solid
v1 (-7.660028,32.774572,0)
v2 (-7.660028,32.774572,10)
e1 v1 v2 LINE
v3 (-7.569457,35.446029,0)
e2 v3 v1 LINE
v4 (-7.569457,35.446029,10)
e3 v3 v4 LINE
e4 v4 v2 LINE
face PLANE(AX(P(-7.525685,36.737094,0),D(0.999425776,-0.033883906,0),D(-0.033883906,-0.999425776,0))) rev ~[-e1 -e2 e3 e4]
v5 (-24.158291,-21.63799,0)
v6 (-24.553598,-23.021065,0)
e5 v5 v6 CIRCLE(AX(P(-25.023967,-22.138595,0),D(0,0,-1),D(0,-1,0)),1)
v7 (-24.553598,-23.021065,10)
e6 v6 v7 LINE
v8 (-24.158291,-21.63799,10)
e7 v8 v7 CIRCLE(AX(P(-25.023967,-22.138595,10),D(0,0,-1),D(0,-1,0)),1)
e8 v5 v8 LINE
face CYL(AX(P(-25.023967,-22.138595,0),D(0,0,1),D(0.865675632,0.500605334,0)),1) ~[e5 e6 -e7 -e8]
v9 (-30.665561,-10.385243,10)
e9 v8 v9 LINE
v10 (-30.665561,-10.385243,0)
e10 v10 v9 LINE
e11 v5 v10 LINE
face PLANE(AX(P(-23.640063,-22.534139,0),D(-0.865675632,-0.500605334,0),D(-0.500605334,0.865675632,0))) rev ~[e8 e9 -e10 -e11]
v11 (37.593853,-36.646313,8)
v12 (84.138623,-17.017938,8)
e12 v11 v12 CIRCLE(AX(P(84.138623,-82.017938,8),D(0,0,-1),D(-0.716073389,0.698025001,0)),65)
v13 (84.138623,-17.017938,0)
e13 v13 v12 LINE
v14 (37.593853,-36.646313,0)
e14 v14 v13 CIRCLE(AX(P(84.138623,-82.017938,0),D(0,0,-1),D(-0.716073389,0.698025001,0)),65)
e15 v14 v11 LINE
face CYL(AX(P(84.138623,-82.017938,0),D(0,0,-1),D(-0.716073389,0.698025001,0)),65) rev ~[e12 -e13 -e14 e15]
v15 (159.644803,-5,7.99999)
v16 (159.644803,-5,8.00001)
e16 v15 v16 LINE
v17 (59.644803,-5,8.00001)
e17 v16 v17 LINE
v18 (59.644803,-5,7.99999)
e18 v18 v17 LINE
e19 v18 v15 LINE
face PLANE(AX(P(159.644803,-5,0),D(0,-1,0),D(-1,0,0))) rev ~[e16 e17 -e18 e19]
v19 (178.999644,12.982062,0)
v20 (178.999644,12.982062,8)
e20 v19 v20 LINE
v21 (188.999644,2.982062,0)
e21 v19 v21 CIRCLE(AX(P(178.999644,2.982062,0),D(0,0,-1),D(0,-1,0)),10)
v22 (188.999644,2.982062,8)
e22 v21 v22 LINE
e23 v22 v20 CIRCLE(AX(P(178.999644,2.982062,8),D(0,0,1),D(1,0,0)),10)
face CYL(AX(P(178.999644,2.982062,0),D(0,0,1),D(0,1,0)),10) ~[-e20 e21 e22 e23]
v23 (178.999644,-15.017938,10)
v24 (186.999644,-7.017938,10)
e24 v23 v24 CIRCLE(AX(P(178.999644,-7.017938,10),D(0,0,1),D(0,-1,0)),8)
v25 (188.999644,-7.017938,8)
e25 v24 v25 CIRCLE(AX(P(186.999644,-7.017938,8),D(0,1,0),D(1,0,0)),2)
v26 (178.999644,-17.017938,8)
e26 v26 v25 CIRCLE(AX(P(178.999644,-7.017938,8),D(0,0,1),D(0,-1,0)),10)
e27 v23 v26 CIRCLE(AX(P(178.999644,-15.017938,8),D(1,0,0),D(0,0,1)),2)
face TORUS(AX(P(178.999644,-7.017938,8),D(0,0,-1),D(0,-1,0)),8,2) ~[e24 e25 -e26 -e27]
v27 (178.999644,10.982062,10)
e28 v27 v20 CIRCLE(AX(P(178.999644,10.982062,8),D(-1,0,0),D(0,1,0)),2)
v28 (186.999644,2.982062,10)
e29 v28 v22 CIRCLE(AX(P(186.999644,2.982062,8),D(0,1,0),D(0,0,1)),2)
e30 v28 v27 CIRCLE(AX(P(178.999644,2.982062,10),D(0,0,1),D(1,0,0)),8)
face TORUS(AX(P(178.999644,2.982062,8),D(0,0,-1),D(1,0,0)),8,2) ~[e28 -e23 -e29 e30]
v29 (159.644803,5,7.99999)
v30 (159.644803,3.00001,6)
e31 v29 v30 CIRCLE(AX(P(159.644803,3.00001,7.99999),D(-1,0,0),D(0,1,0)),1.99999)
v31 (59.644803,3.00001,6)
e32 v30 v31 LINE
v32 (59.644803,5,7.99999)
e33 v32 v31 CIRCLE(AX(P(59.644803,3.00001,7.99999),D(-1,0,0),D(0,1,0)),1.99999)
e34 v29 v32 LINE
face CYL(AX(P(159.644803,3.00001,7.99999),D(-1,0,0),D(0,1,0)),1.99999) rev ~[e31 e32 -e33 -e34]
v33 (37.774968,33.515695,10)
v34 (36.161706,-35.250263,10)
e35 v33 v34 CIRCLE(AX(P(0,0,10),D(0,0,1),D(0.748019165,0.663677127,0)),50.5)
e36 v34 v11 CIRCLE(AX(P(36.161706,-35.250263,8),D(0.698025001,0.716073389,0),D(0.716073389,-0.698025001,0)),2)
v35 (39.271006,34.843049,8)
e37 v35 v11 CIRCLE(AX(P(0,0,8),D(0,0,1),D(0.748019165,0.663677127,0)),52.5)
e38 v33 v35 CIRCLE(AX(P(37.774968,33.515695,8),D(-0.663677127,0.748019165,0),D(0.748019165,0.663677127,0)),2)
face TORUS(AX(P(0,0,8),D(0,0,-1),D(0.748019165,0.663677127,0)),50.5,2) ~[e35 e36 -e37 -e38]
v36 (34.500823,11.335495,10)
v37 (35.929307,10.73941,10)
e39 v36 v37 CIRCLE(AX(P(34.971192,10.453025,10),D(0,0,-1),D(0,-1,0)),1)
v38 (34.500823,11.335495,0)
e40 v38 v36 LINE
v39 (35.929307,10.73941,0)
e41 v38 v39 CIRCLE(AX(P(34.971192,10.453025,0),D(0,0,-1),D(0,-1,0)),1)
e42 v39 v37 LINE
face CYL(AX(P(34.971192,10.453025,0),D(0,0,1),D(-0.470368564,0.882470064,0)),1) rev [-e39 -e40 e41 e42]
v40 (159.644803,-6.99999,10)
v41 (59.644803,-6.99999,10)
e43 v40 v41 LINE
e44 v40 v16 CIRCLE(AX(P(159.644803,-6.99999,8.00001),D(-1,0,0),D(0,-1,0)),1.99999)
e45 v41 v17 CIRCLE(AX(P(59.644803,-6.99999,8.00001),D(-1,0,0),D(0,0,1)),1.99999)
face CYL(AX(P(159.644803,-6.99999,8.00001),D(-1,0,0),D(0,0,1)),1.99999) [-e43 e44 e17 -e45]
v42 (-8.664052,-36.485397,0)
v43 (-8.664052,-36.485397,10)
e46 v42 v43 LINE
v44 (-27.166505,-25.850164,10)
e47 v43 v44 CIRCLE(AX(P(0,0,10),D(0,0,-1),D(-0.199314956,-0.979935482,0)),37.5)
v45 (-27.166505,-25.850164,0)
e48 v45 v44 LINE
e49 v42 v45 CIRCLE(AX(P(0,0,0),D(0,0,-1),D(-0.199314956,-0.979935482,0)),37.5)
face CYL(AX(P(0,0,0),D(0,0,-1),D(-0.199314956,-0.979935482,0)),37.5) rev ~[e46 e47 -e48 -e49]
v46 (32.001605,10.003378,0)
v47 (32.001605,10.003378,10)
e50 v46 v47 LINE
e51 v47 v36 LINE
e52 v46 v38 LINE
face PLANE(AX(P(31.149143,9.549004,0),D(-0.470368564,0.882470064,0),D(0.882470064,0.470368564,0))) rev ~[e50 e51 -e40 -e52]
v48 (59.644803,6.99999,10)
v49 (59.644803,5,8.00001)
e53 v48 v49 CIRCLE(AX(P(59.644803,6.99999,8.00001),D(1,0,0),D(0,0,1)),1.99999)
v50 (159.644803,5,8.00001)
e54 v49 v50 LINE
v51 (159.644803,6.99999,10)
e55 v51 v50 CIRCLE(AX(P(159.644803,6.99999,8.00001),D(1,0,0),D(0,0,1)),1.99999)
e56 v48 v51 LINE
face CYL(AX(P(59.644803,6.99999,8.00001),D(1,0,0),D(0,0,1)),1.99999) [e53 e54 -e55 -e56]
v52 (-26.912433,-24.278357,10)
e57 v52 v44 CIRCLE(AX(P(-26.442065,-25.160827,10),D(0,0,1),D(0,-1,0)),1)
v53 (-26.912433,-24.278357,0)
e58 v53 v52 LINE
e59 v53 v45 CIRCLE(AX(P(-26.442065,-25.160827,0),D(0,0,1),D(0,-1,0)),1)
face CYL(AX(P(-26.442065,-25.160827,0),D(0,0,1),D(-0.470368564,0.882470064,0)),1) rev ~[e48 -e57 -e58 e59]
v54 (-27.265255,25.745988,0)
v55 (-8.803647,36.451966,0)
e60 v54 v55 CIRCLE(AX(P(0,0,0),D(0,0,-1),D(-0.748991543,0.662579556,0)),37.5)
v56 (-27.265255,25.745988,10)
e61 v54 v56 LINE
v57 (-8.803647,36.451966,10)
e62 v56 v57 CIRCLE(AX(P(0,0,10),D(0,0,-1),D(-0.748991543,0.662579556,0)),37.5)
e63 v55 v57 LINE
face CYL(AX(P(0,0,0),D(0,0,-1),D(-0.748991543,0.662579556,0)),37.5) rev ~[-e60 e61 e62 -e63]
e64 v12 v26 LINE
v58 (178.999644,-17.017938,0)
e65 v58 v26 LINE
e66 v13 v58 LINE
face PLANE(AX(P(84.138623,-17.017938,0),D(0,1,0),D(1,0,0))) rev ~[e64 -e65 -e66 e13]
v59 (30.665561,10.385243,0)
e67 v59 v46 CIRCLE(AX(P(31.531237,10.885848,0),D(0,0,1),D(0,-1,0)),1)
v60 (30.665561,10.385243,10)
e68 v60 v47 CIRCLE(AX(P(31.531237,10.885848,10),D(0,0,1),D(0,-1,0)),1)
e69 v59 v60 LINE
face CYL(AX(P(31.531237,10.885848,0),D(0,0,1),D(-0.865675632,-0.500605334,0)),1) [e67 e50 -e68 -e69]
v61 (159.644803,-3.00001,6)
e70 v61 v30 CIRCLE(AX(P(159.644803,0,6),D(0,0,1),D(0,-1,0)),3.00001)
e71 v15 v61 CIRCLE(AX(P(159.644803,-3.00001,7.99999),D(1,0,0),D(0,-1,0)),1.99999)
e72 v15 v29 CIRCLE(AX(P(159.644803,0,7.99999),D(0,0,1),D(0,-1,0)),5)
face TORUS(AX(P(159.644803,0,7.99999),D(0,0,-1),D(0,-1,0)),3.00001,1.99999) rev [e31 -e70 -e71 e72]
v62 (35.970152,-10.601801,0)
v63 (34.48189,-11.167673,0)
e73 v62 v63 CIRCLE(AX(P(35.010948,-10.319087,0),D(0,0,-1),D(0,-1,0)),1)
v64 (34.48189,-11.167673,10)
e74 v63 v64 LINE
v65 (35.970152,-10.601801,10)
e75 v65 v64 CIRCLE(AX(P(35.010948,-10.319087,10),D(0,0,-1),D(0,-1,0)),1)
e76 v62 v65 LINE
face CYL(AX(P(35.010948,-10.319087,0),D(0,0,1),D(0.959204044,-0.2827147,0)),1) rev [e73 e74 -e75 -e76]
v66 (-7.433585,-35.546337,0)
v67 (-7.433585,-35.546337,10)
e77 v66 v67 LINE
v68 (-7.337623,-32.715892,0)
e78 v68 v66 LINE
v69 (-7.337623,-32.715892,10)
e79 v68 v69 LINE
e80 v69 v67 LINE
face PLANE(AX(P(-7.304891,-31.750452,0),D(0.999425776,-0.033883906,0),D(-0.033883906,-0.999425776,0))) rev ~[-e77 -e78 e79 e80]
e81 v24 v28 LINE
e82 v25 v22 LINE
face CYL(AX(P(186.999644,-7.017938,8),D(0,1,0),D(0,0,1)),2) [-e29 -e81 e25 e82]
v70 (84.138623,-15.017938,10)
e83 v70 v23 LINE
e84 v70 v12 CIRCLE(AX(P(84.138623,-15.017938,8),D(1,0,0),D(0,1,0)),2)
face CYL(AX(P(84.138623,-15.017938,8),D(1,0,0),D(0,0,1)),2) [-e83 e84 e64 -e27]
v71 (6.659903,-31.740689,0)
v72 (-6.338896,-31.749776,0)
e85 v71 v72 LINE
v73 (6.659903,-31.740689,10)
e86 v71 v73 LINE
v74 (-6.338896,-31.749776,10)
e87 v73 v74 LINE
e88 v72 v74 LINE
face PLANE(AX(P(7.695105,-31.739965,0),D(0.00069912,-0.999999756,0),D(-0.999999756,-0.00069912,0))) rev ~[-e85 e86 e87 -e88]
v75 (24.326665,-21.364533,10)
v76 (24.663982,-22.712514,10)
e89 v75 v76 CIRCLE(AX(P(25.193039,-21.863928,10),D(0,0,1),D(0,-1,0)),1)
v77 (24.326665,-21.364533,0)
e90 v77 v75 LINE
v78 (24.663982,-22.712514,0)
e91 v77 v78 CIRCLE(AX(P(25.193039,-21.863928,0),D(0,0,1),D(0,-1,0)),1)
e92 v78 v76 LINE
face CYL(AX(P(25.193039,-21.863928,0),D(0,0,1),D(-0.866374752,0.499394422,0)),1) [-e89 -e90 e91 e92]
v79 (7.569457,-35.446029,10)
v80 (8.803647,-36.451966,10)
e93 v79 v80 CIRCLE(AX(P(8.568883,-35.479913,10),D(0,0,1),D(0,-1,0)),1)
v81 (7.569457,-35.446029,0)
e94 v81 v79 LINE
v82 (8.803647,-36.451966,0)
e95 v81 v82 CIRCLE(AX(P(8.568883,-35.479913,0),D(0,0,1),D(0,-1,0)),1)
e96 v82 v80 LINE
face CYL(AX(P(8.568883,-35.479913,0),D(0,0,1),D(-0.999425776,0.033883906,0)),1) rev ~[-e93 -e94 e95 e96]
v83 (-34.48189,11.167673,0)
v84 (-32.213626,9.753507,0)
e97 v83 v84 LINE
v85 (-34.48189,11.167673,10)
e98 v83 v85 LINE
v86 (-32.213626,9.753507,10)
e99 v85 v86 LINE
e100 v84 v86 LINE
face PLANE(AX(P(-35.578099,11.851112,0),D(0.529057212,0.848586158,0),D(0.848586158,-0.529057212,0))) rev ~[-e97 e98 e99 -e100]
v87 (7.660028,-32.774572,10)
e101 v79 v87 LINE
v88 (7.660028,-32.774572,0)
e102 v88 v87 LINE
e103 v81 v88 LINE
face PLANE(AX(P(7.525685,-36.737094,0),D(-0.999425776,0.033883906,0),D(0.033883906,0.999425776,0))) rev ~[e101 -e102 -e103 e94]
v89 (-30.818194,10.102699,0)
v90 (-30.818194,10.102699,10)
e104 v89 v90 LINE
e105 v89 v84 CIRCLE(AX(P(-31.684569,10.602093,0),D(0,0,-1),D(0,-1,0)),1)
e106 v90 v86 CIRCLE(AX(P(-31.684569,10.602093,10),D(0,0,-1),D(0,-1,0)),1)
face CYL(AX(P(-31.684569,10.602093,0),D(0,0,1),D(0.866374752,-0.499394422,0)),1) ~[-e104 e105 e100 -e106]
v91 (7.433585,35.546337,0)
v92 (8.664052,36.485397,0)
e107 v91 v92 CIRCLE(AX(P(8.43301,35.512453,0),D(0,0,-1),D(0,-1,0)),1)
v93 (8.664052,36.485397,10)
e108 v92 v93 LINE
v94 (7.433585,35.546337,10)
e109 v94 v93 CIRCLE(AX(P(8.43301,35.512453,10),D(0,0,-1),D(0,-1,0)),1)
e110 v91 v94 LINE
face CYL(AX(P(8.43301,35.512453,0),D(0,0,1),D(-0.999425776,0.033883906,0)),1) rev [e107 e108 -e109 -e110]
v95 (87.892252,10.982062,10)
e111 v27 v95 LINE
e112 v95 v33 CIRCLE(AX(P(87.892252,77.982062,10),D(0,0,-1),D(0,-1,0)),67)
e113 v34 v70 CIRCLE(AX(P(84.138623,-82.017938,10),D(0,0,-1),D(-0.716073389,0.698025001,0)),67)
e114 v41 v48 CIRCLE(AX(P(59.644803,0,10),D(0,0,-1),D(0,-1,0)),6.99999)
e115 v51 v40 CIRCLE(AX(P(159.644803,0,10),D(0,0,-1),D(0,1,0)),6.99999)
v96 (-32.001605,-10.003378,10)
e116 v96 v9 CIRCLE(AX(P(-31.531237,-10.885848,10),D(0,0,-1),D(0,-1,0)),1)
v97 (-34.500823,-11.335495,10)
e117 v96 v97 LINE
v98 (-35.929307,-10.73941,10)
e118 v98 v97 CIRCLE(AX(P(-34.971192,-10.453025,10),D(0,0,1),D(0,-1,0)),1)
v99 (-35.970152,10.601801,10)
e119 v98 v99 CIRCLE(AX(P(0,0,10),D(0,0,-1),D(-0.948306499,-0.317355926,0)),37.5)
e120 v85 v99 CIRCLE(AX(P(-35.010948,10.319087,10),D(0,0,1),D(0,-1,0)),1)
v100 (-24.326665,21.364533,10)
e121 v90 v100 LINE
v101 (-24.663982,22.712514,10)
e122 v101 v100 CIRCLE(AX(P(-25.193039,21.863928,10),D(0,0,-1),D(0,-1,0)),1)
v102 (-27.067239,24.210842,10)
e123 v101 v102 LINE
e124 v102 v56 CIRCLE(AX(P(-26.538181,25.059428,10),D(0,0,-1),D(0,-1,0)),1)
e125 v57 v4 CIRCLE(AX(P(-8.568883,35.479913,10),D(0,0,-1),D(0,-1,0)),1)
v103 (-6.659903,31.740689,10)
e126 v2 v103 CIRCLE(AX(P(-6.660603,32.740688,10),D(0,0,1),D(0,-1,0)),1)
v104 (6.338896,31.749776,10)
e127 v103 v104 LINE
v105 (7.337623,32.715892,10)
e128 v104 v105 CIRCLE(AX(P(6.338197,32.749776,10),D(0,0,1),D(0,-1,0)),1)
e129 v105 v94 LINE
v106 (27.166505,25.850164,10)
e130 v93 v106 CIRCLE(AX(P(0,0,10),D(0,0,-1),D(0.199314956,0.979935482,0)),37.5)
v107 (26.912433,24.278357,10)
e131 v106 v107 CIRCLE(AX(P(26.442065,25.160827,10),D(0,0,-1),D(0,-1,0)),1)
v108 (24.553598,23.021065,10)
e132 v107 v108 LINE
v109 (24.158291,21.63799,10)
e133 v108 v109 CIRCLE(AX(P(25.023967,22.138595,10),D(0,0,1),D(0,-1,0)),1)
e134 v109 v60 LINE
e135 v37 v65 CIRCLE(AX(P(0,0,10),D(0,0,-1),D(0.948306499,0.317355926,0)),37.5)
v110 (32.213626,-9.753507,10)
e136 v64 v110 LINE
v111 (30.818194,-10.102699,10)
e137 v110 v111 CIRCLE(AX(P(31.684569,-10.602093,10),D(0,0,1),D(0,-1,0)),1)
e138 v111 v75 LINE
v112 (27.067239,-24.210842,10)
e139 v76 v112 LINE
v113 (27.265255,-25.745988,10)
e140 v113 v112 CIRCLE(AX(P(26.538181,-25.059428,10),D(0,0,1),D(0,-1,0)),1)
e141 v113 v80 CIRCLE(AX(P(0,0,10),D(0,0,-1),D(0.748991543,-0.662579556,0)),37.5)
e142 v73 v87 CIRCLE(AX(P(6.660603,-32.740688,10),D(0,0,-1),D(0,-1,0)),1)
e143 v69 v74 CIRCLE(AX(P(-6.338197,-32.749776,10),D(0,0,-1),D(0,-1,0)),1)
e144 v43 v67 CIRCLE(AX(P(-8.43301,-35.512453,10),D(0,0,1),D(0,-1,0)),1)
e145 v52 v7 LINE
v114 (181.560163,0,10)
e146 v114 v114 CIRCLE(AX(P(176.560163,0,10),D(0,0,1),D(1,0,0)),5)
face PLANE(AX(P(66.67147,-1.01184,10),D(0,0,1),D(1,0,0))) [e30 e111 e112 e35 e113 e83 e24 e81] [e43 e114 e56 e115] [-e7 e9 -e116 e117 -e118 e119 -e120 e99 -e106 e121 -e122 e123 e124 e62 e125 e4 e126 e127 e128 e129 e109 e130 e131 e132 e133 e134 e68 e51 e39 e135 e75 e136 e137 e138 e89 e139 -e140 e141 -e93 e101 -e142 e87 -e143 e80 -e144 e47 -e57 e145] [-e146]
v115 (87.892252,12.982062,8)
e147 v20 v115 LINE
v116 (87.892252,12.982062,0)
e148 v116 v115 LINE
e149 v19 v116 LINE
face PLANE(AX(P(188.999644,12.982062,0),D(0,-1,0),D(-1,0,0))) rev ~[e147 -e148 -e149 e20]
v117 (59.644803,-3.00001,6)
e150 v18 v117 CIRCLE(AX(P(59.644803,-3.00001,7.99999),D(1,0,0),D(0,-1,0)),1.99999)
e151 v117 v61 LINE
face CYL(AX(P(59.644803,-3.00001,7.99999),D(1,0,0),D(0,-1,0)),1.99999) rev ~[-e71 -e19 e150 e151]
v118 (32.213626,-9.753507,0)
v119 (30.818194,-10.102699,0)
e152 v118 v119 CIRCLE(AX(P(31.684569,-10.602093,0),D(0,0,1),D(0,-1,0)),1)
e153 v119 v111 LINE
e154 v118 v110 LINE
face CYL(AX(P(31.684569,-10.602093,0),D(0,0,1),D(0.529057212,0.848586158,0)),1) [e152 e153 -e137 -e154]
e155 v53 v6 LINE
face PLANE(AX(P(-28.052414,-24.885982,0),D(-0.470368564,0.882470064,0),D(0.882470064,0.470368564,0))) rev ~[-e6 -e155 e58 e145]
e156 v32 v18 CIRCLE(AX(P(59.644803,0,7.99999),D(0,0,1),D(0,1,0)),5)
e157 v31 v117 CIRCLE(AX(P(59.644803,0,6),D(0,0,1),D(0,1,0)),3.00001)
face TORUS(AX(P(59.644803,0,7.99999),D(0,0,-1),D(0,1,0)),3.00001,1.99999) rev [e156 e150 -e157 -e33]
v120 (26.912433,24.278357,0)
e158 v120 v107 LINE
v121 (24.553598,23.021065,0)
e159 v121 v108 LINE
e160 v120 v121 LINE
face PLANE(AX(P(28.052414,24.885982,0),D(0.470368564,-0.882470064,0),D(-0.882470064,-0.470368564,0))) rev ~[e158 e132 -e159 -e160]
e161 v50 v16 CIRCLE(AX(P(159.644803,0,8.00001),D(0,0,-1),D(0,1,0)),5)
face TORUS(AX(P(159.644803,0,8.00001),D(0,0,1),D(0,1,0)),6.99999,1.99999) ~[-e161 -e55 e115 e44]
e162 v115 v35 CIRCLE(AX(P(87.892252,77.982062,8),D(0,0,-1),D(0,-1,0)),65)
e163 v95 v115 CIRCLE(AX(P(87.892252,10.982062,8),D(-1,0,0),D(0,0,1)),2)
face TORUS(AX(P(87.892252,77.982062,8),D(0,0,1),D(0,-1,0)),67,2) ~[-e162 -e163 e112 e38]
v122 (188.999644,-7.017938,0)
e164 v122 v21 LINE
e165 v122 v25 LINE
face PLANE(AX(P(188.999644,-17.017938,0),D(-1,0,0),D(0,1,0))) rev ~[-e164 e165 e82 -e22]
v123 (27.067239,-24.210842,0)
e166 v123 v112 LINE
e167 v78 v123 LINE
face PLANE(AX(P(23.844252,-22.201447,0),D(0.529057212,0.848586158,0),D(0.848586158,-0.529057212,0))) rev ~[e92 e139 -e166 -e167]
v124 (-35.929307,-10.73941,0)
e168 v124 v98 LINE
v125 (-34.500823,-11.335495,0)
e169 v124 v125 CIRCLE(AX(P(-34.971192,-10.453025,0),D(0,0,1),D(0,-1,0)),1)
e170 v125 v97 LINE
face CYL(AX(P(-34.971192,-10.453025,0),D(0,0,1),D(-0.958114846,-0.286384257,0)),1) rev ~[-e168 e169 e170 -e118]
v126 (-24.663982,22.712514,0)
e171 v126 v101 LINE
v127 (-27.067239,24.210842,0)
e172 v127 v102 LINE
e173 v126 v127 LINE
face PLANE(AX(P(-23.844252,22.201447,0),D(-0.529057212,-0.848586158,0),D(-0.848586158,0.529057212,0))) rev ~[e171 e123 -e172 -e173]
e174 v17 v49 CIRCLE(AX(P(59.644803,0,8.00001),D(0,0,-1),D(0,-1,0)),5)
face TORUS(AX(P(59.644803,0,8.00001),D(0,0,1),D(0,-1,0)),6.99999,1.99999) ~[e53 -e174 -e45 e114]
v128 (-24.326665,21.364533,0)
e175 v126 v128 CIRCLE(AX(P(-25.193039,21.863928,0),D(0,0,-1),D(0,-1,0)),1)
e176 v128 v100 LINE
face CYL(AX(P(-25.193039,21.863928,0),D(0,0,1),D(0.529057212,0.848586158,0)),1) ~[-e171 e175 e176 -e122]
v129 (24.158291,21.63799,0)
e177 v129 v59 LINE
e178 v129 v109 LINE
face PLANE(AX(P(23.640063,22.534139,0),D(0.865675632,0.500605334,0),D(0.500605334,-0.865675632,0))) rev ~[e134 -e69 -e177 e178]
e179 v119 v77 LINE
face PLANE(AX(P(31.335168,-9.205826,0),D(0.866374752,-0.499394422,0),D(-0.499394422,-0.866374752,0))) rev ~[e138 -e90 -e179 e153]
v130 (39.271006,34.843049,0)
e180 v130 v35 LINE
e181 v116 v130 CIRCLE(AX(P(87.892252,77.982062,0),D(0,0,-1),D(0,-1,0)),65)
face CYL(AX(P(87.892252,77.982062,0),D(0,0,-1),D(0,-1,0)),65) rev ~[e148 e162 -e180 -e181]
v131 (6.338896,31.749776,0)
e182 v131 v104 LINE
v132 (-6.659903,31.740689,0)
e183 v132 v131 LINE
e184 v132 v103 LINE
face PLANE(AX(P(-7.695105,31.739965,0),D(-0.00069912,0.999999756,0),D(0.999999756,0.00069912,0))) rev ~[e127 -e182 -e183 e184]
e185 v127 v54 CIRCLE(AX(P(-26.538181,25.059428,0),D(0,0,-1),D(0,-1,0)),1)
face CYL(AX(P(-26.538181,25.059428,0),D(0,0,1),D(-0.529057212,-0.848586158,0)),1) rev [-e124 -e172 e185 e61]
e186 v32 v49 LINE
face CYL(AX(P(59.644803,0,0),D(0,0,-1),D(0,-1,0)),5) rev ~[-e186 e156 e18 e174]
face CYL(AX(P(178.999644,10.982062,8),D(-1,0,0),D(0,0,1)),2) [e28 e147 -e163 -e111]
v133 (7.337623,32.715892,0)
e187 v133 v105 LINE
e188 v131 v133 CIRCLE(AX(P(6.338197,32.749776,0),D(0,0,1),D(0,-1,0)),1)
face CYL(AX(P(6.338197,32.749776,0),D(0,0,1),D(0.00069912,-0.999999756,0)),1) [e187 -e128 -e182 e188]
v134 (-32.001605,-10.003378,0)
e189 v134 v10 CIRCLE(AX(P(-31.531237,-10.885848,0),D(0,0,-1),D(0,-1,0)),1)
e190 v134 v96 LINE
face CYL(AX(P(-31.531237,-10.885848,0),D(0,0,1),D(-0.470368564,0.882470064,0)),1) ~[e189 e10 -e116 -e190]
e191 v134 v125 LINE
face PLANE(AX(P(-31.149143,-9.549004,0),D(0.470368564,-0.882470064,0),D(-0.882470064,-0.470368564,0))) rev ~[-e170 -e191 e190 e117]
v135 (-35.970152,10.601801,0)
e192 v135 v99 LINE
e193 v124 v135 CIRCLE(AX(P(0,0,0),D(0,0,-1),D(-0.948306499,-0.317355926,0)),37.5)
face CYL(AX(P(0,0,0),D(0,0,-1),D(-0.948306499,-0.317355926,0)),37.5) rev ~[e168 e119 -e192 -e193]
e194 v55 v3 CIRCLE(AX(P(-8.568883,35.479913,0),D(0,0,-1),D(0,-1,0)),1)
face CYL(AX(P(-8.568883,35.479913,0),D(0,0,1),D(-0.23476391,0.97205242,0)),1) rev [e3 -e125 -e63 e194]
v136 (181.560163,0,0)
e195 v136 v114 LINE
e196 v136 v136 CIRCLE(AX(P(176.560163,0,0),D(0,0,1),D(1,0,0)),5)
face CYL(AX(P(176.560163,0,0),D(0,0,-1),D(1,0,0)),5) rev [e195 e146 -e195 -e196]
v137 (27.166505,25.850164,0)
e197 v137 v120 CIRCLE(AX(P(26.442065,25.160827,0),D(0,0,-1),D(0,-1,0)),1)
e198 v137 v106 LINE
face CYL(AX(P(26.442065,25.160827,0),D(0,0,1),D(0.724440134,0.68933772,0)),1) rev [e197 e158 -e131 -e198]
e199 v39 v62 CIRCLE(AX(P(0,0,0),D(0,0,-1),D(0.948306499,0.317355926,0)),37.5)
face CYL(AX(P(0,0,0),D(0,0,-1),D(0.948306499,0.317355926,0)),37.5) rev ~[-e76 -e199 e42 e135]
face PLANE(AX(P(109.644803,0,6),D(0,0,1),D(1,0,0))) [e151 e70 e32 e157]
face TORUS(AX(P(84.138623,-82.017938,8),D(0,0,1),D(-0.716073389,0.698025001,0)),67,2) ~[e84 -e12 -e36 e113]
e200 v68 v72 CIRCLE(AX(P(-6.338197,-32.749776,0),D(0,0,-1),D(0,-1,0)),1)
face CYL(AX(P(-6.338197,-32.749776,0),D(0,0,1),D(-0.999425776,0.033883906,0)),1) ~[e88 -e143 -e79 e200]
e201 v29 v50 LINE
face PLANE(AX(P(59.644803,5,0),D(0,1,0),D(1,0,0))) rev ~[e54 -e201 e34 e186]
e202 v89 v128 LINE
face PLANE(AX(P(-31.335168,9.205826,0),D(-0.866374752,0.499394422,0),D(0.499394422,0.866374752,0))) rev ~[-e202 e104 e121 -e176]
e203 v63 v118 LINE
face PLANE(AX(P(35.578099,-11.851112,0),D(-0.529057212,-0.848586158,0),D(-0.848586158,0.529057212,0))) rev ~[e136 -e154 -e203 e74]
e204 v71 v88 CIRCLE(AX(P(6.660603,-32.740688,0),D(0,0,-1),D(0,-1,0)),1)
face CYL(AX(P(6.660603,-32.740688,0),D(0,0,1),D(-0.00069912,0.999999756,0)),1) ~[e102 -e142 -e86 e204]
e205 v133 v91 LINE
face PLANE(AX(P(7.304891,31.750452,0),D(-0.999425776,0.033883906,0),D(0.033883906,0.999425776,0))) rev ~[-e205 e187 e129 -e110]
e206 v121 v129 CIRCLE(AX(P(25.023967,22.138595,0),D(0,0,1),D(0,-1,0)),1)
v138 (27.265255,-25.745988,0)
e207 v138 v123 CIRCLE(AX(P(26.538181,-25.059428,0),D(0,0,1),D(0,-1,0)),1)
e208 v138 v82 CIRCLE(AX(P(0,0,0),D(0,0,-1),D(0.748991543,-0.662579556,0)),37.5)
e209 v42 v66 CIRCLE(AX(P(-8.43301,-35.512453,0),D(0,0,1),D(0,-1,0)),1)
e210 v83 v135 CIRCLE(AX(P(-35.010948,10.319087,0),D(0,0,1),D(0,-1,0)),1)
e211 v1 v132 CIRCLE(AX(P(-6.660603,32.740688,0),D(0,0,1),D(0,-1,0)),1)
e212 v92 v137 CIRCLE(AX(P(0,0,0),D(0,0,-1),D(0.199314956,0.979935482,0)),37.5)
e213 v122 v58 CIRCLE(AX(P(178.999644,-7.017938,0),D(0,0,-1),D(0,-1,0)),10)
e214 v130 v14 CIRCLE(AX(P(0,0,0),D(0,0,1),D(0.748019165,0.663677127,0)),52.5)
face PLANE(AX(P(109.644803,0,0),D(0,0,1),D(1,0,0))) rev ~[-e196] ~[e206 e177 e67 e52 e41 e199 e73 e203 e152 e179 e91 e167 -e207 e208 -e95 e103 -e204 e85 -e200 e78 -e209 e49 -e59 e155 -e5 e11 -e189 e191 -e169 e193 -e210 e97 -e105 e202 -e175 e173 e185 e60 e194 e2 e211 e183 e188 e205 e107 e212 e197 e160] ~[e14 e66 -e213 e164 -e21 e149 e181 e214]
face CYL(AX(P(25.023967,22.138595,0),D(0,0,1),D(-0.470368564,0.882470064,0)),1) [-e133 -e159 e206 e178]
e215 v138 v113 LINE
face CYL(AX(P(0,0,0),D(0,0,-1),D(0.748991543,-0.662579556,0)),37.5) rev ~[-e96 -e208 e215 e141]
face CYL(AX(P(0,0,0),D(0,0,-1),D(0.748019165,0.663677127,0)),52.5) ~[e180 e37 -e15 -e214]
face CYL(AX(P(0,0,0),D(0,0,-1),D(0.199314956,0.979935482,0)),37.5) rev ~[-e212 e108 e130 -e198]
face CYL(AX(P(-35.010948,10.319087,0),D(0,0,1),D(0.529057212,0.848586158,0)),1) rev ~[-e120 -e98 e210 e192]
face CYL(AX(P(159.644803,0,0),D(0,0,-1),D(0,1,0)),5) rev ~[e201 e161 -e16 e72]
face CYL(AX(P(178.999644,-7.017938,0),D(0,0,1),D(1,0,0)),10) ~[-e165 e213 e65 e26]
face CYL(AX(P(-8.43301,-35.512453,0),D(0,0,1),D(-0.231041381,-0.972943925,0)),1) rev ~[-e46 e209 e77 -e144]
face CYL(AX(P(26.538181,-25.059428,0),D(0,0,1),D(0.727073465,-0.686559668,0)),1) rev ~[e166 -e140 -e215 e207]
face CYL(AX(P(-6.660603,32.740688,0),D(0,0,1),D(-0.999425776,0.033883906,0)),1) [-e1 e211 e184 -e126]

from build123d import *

# Parameters (mm, degrees)
F0_R     = 5
F1_DEPTH = 10
F2_R     = 10
F3_R     = 1
F4_DEPTH = 6
F5_R     = 1.99999
F6_R     = 2


# Not quite as in the source:
# - a fillet or chamfer is up to 0.001 mm smaller than in the source, because OpenCascade refuses the exact size


with BuildPart() as f1:
    # F0 (on Top) → F1 (new body)
    with BuildSketch(Plane.XY):
        with BuildLine():
            ThreePointArc((87.8922518749, 12.982062427), (61.2373823548, 18.6986926605), (39.2710061569, 34.8430491695))
            ThreePointArc((39.2710061569, 34.8430491695), (-52.4855584858, 1.231320604), (37.5938529252, -36.6463125326))
            ThreePointArc((37.5938529252, -36.6463125326), (58.881501719, -22.1257192654), (84.1386232135, -17.017937573))
            Line((84.1386232135, -17.017937573), (188.9996444946, -17.017937573))
            Line((188.9996444946, -17.017937573), (188.9996444946, 12.982062427))
            Line((188.9996444946, 12.982062427), (87.8922518749, 12.982062427))
        make_face()
        with BuildLine():
            ThreePointArc((-28.0871828778, 24.8467333464), (-18.7727000217, 32.4628361961), (-7.5256854941, 36.7370937588))
            Line((-7.5256854941, 36.7370937588), (-7.6951050263, 31.7399648809))
            Line((-7.6951050263, 31.7399648809), (7.3048913079, 31.7504516883))
            Line((7.3048913079, 31.7504516883), (7.4743108401, 36.7475805661))
            ThreePointArc((7.4743108401, 36.7475805661), (18.7272908139, 32.4890532145), (28.0524137093, 24.8859816982))
            Line((28.0524137093, 24.8859816982), (23.6400633889, 22.5341388781))
            Line((23.6400633889, 22.5341388781), (31.1491433976, 9.5490043996))
            Line((31.1491433976, 9.5490043996), (35.561493718, 11.9008472197))
            ThreePointArc((35.561493718, 11.9008472197), (37.4999908356, 0.0262170183), (35.5780992034, -11.8511120606))
            Line((35.5780992034, -11.8511120606), (31.3351684153, -9.2058260029))
            Line((31.3351684153, -9.2058260029), (23.8442520897, -22.2014472886))
            Line((23.8442520897, -22.2014472886), (28.0871828778, -24.8467333464))
            ThreePointArc((28.0871828778, -24.8467333464), (18.7727000217, -32.4628361961), (7.5256854941, -36.7370937588))
            Line((7.5256854941, -36.7370937588), (7.6951050263, -31.7399648809))
            Line((7.6951050263, -31.7399648809), (-7.3048913079, -31.7504516883))
            Line((-7.3048913079, -31.7504516883), (-7.4743108401, -36.7475805661))
            ThreePointArc((-7.4743108401, -36.7475805661), (-18.7272908139, -32.4890532145), (-28.0524137093, -24.8859816982))
            Line((-28.0524137093, -24.8859816982), (-23.6400633889, -22.5341388781))
            Line((-23.6400633889, -22.5341388781), (-31.1491433976, -9.5490043996))
            Line((-31.1491433976, -9.5490043996), (-35.561493718, -11.9008472197))
            ThreePointArc((-35.561493718, -11.9008472197), (-37.4999908356, -0.0262170183), (-35.5780992034, 11.8511120606))
            Line((-35.5780992034, 11.8511120606), (-31.3351684153, 9.2058260029))
            Line((-31.3351684153, 9.2058260029), (-23.8442520897, 22.2014472886))
            Line((-23.8442520897, 22.2014472886), (-28.0871828778, 24.8467333464))
        make_face(mode=Mode.SUBTRACT)
        with BuildLine():
            Line((159.6448034048, -5), (59.6448034048, -5))
            ThreePointArc((59.6448034048, -5), (54.6448034048, 0), (59.6448034048, 5))
            Line((59.6448034048, 5), (159.6448034048, 5))
            ThreePointArc((159.6448034048, 5), (164.6448034048, 0), (159.6448034048, -5))
        make_face(mode=Mode.SUBTRACT)
        with Locations((176.5601634979, 0)):
            Circle(F0_R, mode=Mode.SUBTRACT)
    extrude(amount=F1_DEPTH)

    # F2
    f2_edges = [f1.edges().sort_by_distance(p)[0] for p in [
        (188.999644, 12.982062, 5),
        (188.999644, -17.017938, 5),
    ]]
    fillet(f2_edges, radius=F2_R)

    # F3
    f3_edges = [f1.edges().sort_by_distance(p)[0] for p in [
        (-7.525685, 36.737094, 5),
        (-7.695105, 31.739965, 5),
        (7.304891, 31.750452, 5),
        (7.474311, 36.747581, 5),
        (23.640063, 22.534139, 5),
        (28.052414, 24.885982, 5),
        (31.149143, 9.549004, 5),
        (35.561494, 11.900847, 5),
        (35.578099, -11.851112, 5),
        (31.335168, -9.205826, 5),
        (23.844252, -22.201447, 5),
        (28.087183, -24.846733, 5),
        (7.525685, -36.737094, 5),
        (7.695105, -31.739965, 5),
        (-7.304891, -31.750452, 5),
        (-7.474311, -36.747581, 5),
        (-28.052414, -24.885982, 5),
        (-23.640063, -22.534139, 5),
        (-31.149143, -9.549004, 5),
        (-35.561494, -11.900847, 5),
        (-35.578099, 11.851112, 5),
        (-31.335168, 9.205826, 5),
        (-23.844252, 22.201447, 5),
        (-28.087183, 24.846733, 5),
    ]]
    fillet(f3_edges, radius=F3_R)

    # F0 (on Top) → F4 (join)
    with BuildSketch(Plane.XY):
        with BuildLine():
            ThreePointArc((59.6448034048, 5), (54.6448034048, 0), (59.6448034048, -5))
            Line((59.6448034048, -5), (159.6448034048, -5))
            ThreePointArc((159.6448034048, -5), (164.6448034048, 0), (159.6448034048, 5))
            Line((159.6448034048, 5), (59.6448034048, 5))
        make_face()
    extrude(amount=F4_DEPTH)

    # F5 (radius 2 in the source; OpenCascade refuses exactly that, so slightly less here)
    f5_edges = [f1.edges().sort_by_distance(p)[0] for p in [
        (109.644803, 5, 6),
        (109.644803, 5, 10),
    ]]
    fillet(f5_edges, radius=F5_R)

    # F6
    f6_edges = [f1.edges().sort_by_distance(p)[0] for p in [
        (-52.485558, 1.231321, 10),
    ]]
    fillet(f6_edges, radius=F6_R)


solid = f1.part
